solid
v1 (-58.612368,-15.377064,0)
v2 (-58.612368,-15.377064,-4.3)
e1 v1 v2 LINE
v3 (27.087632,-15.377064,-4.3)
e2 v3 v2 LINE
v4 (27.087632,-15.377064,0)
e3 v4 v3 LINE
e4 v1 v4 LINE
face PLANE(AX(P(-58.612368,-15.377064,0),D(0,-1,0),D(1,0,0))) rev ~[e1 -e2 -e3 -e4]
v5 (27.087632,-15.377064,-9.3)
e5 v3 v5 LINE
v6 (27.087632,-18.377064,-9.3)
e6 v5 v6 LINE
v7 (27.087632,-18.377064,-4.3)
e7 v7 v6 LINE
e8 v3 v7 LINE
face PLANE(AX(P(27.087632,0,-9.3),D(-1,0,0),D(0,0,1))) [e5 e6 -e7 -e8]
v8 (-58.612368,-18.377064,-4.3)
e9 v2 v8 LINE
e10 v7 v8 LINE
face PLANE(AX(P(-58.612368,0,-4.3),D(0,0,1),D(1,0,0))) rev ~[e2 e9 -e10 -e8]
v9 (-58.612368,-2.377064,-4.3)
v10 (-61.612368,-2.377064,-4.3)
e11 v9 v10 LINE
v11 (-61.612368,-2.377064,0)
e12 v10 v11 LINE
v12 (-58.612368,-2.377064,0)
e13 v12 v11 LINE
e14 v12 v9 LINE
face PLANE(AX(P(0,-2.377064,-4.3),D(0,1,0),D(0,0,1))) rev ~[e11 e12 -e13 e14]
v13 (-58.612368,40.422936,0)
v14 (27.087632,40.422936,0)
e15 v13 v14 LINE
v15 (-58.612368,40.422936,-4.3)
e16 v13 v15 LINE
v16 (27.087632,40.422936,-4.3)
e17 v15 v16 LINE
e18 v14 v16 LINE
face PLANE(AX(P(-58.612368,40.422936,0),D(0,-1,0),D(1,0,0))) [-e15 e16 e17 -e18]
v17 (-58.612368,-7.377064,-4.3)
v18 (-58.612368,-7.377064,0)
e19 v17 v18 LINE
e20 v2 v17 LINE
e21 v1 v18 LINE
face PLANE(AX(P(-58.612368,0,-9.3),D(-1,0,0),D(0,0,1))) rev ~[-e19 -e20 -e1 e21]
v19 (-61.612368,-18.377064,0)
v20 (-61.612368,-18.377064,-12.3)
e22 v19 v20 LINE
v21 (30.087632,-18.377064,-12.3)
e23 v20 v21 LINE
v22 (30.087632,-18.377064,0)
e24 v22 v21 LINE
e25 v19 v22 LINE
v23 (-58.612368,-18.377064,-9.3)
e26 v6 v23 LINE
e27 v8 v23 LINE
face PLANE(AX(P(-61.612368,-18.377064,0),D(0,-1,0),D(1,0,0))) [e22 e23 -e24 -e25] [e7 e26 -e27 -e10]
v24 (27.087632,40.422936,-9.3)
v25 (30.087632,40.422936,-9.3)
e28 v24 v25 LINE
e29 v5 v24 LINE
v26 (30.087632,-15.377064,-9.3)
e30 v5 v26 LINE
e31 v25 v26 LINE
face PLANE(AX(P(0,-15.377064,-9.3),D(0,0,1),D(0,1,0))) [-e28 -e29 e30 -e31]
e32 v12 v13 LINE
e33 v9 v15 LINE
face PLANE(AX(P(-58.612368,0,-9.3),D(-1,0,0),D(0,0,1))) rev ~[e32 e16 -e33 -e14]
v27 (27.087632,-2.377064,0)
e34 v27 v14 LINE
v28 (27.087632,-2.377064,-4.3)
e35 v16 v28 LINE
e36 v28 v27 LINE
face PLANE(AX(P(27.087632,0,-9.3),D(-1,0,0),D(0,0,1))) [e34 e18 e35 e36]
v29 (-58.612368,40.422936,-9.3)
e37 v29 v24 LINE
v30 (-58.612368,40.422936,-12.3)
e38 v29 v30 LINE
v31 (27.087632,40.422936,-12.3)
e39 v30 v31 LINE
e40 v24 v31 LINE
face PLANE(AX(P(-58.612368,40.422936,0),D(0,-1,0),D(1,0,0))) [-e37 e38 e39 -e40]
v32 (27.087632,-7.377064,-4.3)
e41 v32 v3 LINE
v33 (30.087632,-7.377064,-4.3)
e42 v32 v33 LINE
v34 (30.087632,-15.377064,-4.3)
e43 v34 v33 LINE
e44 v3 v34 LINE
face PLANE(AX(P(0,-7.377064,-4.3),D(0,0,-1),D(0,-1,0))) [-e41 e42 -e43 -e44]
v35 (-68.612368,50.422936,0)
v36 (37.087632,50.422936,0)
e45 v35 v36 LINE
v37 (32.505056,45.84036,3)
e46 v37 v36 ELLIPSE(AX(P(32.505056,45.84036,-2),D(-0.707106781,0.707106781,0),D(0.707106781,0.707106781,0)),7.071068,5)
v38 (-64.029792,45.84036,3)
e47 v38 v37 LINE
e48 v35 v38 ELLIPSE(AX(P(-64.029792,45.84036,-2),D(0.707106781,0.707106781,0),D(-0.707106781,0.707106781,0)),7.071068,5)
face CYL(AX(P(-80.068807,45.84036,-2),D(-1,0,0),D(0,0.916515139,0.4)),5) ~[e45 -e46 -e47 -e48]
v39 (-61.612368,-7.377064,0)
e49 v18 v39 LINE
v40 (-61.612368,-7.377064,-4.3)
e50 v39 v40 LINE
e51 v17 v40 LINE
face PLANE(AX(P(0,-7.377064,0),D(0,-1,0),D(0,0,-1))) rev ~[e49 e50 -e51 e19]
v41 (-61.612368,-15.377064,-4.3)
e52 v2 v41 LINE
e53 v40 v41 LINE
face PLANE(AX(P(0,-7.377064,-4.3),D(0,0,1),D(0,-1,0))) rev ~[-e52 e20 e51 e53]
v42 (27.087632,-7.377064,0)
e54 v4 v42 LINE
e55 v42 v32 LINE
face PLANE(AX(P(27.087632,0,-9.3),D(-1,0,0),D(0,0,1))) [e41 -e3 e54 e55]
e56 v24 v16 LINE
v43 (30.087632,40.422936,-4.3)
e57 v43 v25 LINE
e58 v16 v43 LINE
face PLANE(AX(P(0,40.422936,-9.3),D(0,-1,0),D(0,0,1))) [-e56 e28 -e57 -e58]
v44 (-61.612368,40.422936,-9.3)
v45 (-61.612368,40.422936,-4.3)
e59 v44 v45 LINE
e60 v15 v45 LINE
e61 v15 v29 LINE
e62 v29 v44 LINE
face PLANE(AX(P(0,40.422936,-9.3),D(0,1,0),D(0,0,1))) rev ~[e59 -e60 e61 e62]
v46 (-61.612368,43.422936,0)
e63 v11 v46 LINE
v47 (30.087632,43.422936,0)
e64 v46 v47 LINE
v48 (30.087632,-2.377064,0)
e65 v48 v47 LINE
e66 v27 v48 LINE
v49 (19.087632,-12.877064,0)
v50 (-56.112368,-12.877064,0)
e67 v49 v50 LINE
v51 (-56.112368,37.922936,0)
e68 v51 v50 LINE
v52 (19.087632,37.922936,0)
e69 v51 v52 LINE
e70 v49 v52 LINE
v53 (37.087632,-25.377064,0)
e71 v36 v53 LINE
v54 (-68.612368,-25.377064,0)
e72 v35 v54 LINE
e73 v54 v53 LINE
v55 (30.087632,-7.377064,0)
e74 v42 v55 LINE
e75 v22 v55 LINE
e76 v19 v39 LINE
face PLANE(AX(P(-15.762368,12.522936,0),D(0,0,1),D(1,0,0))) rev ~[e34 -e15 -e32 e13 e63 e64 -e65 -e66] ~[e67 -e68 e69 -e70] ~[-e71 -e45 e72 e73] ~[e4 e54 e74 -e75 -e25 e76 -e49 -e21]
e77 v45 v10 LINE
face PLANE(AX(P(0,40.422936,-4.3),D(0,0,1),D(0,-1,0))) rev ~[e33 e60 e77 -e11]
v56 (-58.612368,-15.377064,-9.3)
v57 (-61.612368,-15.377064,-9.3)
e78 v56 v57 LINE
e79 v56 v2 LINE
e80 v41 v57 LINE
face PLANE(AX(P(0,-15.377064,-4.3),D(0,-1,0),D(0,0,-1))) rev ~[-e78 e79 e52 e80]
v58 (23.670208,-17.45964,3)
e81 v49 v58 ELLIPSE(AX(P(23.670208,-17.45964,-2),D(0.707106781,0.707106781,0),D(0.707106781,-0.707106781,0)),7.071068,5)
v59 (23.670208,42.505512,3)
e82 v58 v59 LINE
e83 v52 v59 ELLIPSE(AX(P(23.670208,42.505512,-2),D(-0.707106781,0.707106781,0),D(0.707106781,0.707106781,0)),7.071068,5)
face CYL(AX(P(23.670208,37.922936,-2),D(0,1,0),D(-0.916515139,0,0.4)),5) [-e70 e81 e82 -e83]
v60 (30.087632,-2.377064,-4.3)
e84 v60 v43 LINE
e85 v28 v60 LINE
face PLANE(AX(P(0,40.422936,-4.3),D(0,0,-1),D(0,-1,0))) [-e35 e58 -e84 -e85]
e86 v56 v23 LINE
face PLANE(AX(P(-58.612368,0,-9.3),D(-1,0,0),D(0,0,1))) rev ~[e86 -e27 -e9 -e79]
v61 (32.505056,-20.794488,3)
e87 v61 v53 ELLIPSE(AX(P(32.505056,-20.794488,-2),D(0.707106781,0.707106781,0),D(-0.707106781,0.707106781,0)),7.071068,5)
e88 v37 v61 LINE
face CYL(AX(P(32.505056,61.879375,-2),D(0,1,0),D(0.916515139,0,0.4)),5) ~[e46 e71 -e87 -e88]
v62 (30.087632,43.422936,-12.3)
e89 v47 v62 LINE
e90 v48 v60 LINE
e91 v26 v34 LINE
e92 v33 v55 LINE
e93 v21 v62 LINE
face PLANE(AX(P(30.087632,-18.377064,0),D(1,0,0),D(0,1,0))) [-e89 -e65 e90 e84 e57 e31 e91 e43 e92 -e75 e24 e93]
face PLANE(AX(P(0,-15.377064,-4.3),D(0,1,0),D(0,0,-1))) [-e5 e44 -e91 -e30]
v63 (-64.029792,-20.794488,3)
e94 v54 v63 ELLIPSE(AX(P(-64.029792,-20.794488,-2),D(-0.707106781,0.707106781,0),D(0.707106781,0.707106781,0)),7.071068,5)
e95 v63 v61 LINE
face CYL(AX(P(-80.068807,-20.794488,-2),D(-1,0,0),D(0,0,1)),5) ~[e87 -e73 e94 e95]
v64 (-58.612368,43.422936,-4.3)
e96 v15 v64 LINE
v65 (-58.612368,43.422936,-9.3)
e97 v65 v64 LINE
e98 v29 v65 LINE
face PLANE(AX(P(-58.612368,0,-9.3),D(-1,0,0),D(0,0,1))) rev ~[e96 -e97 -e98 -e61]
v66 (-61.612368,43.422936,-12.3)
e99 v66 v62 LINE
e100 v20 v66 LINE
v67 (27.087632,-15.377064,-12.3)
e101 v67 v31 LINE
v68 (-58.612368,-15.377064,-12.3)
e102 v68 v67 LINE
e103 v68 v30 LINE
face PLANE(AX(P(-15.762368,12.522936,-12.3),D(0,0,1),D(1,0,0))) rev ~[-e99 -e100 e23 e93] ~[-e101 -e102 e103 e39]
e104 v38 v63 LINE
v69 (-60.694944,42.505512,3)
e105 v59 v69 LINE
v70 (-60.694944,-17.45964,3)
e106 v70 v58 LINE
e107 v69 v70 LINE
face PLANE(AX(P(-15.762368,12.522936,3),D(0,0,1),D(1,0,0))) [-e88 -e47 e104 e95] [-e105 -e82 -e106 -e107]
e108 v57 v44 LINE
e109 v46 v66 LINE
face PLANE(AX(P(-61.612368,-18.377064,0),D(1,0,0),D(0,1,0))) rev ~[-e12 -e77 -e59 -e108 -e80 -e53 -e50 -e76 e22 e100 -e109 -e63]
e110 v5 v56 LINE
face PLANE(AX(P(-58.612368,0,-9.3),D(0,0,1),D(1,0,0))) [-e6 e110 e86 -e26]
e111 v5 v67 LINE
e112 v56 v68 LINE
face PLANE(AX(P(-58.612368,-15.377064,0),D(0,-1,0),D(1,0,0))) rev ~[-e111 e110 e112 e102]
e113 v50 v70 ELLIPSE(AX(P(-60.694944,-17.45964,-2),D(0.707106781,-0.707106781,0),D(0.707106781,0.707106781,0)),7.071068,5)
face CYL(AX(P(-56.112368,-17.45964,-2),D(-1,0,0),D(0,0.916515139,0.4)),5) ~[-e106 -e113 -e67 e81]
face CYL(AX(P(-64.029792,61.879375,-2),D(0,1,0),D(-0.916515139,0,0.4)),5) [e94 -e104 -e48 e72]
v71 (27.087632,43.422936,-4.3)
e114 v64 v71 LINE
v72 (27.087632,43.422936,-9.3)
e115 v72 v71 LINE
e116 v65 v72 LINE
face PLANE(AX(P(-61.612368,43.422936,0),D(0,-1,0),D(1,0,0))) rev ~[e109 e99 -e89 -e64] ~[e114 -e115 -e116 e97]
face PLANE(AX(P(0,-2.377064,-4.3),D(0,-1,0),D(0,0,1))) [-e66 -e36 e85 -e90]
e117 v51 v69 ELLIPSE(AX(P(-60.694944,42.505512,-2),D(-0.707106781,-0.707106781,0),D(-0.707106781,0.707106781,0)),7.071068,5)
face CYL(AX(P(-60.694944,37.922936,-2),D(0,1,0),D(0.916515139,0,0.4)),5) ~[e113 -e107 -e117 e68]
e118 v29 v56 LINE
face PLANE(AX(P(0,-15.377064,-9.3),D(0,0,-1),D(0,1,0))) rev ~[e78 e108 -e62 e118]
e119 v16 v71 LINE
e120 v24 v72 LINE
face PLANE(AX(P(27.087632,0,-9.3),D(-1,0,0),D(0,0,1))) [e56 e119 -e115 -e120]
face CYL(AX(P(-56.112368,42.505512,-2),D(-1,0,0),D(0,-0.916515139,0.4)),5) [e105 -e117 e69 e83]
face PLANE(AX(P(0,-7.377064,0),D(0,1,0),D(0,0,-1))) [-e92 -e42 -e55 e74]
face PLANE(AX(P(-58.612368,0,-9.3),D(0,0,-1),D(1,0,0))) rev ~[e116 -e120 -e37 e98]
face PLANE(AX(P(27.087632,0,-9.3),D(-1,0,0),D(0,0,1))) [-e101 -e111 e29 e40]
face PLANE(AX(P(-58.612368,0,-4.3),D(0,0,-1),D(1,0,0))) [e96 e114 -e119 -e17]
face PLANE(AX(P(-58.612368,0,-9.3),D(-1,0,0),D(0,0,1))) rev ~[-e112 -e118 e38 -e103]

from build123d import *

# Parameters (mm, degrees)
F2_W          = 105.7
F2_H          = 75.8
F2_W_2        = 8
F2_H_2        = 2.5
F2_H_3        = 50.8
F4_DEPTH      = 3
F3_W          = 91.7
F3_H          = 61.8
F3_W_2        = 85.7
F3_H_2        = 55.8
F5_DEPTH      = 12.3
F6_W          = 85.7
F6_H          = 5
F7_DEPTH      = 50.4239358673
F7_DEPTH_BACK = 25
F9_DEPTH      = 68.6133680484
F9_DEPTH_BACK = 37.0886319516
F10_T1_DEPTH  = 98.7128784748
F10_T3_DEPTH  = 128.6128784748
F10_T5_DEPTH  = 50.8
F10_T7_DEPTH  = 75.2
F10_T13_DEPTH = 62.2564392374
F10_T17_DEPTH = 86.6564392374
F10_T24_DEPTH = 86.6564392374
F10_T28_DEPTH = 62.2564392374
F10_T35_DEPTH = 86.6564392374
F10_T39_DEPTH = 62.2564392374
F10_T46_DEPTH = 86.6564392374
F10_T50_DEPTH = 62.2564392374


# Not quite as in the source:
# - a fillet or chamfer that OpenCascade refuses, or shapes differently, is made with other operations: its cross-section is extruded or revolved along the edge and cut away or added


with BuildPart() as f4:
    # F2 (on Top) → F4 (new body)
    with BuildSketch(Plane.XY):
        with Locations((-15.7623680484, 12.5229358673)):
            Rectangle(F2_W, F2_H)
        Polygon((-58.6123680484, -15.3770641327), (-58.6123680484, 40.4229358673), (19.0876319516, 40.4229358673), (27.0876319516, 40.4229358673), (27.0876319516, 37.9229358673), (27.0876319516, -12.8770641327), (27.0876319516, -15.3770641327), (19.0876319516, -15.3770641327), align=None, mode=Mode.SUBTRACT)
        Polygon((19.0876319516, 40.4229358673), (-58.6123680484, 40.4229358673), (-58.6123680484, -15.3770641327), (19.0876319516, -15.3770641327), (19.0876319516, -12.8770641327), (-56.1123680484, -12.8770641327), (-56.1123680484, 37.9229358673), (19.0876319516, 37.9229358673), align=None)
        with Locations((23.0876319516, 39.1729358673)):
            Rectangle(F2_W_2, F2_H_2)
        with Locations((23.0876319516, 12.5229358673)):
            Rectangle(F2_W_2, F2_H_3)
        with Locations((23.0876319516, -14.1270641327)):
            Rectangle(F2_W_2, F2_H_2)
    extrude(amount=F4_DEPTH)

    # F3 (on Top) → F5 (join)
    with BuildSketch(Plane.XY):
        with Locations((-15.7623680484, 12.5229358673)):
            Rectangle(F3_W, F3_H)
        with Locations((-15.7623680484, 12.5229358673)):
            Rectangle(F3_W_2, F3_H_2, mode=Mode.SUBTRACT)
    extrude(amount=-F5_DEPTH)

    # F6 (on Front) → F7 (cut, two sides)
    with BuildSketch(Plane.XZ) as f7_sk:
        with Locations((-15.7623680484, -6.8)):
            Rectangle(F6_W, F6_H)
    extrude(amount=-F7_DEPTH, mode=Mode.SUBTRACT)
    extrude(f7_sk.sketch, amount=F7_DEPTH_BACK, mode=Mode.SUBTRACT)

    # F8 (on Right) → F9 (cut, two sides)
    with BuildSketch(Plane.YZ) as f9_sk:
        Polygon((-2.3770641327, -3.112567123), (-2.3770641327, 0), (-7.3770641327, 0), (-7.3770641327, -3.112567123), (-7.3770641327, -4.3), (-2.3770641327, -4.3), align=None)
        Polygon((40.4229358673, -9.3), (40.4229358673, -4.3), (-2.3770641327, -4.3), (-7.3770641327, -4.3), (-15.3770641327, -4.3), (-15.3770641327, -9.3), align=None)
    extrude(amount=-F9_DEPTH, mode=Mode.SUBTRACT)
    extrude(f9_sk.sketch, amount=F9_DEPTH_BACK, mode=Mode.SUBTRACT)

    # F10: fillet of radius 5 on 8 edges, made by hand

    # F10_s2 → F10_t1 (cut)
    with BuildSketch(Plane.XZ.offset(-61.8793751047)):
        with BuildLine():
            ThreePointArc((37.0876319516, 0), (35.2436690442, 2.1833001327), (32.5050562567, 3))
            Line((32.5050562567, 3), (32.5050562567, 3.1))
            Line((32.5050562567, 3.1), (37.0876319516, 3.1))
            Line((37.0876319516, 3.1), (37.1876319516, 3))
            ThreePointArc((37.1876319516, 3), (37.1876319516, 1.5), (37.1792834655, 0.04))
            Line((37.1792834655, 0.04), (37.0876319516, 0))
        make_face()
        with BuildLine():
            ThreePointArc((-68.6123680484, 0), (-66.768405141, 2.1833001327), (-64.0297923534, 3))
            Line((-64.0297923534, 3), (-64.0297923534, 3.1))
            Line((-64.0297923534, 3.1), (-68.6123680484, 3.1))
            Line((-68.6123680484, 3.1), (-68.7123680484, 3))
            ThreePointArc((-68.7123680484, 3), (-68.7123680484, 1.5), (-68.7040195623, 0.04))
            Line((-68.7040195623, 0.04), (-68.6123680484, 0))
        make_face()
    extrude(amount=F10_T1_DEPTH, mode=Mode.SUBTRACT)

    # F10_s4 → F10_t3 (cut)
    with BuildSketch(Plane.YZ.offset(-80.0688072858)):
        with BuildLine():
            ThreePointArc((50.4229358673, 0), (48.5789729599, 2.1833001327), (45.8403601724, 3))
            Line((45.8403601724, 3), (45.8403601724, 3.1))
            Line((45.8403601724, 3.1), (50.4229358673, 3.1))
            Line((50.4229358673, 3.1), (50.5229358673, 3))
            ThreePointArc((50.5229358673, 3), (50.5229358673, 1.5), (50.5145873812, 0.04))
            Line((50.5145873812, 0.04), (50.4229358673, 0))
        make_face()
        with BuildLine():
            ThreePointArc((-20.7944884377, 3), (-23.5331012253, 2.1833001327), (-25.3770641327, 0))
            Line((-25.3770641327, 0), (-25.4687156466, 0.04))
            ThreePointArc((-25.4687156466, 0.04), (-25.4770641327, 1.5), (-25.4770641327, 3))
            Line((-25.4770641327, 3), (-25.3770641327, 3.1))
            Line((-25.3770641327, 3.1), (-20.7944884377, 3.1))
            Line((-20.7944884377, 3.1), (-20.7944884377, 3))
        make_face()
    extrude(amount=F10_T3_DEPTH, mode=Mode.SUBTRACT)

    # F10_s6 → F10_t5 (cut)
    with BuildSketch(Plane.XZ.offset(-37.9229358673)):
        with BuildLine():
            ThreePointArc((19.0876319516, 0), (20.931594859, 2.1833001327), (23.6702076466, 3))
            Line((23.6702076466, 3), (23.6702076466, 3.1))
            Line((23.6702076466, 3.1), (19.0876319516, 3.1))
            Line((19.0876319516, 3.1), (18.9876319516, 3))
            ThreePointArc((18.9876319516, 3), (18.9876319516, 1.5), (18.9959804377, 0.04))
            Line((18.9959804377, 0.04), (19.0876319516, 0))
        make_face()
        with BuildLine():
            ThreePointArc((-56.1123680484, 0), (-57.9563309558, 2.1833001327), (-60.6949437433, 3))
            Line((-60.6949437433, 3), (-60.6949437433, 3.1))
            Line((-60.6949437433, 3.1), (-56.1123680484, 3.1))
            Line((-56.1123680484, 3.1), (-56.0123680484, 3))
            ThreePointArc((-56.0123680484, 3), (-56.0123680484, 1.5), (-56.0207165345, 0.04))
            Line((-56.0207165345, 0.04), (-56.1123680484, 0))
        make_face()
    extrude(amount=F10_T5_DEPTH, mode=Mode.SUBTRACT)

    # F10_s8 → F10_t7 (cut)
    with BuildSketch(Plane.YZ.offset(-56.1123680484)):
        with BuildLine():
            ThreePointArc((-12.8770641327, 0), (-14.7210270401, 2.1833001327), (-17.4596398276, 3))
            Line((-17.4596398276, 3), (-17.4596398276, 3.1))
            Line((-17.4596398276, 3.1), (-12.8770641327, 3.1))
            Line((-12.8770641327, 3.1), (-12.7770641327, 3))
            ThreePointArc((-12.7770641327, 3), (-12.7770641327, 1.5), (-12.7854126188, 0.04))
            Line((-12.7854126188, 0.04), (-12.8770641327, 0))
        make_face()
        with BuildLine():
            ThreePointArc((37.9229358673, 0), (39.7668987747, 2.1833001327), (42.5055115623, 3))
            Line((42.5055115623, 3), (42.5055115623, 3.1))
            Line((42.5055115623, 3.1), (37.9229358673, 3.1))
            Line((37.9229358673, 3.1), (37.8229358673, 3))
            ThreePointArc((37.8229358673, 3), (37.8229358673, 1.5), (37.8312843534, 0.04))
            Line((37.8312843534, 0.04), (37.9229358673, 0))
        make_face()
    extrude(amount=F10_T7_DEPTH, mode=Mode.SUBTRACT)


with BuildPart() as f10_tool11:
    # F10_s12 → F10_t13 (new body)
    with BuildSketch(Plane.XZ.offset(-49.3793751047)):
        with BuildLine():
            ThreePointArc((19.0876319516, 0), (20.931594859, 2.1833001327), (23.6702076466, 3))
            Line((23.6702076466, 3), (23.6702076466, 3.1))
            Line((23.6702076466, 3.1), (19.0876319516, 3.1))
            Line((19.0876319516, 3.1), (18.9876319516, 3))
            ThreePointArc((18.9876319516, 3), (18.9876319516, 1.5), (18.9959804377, 0.04))
            Line((18.9959804377, 0.04), (19.0876319516, 0))
        make_face()
    extrude(amount=F10_T13_DEPTH)

    split(bisect_by=Plane.XZ.offset(-37.9229358673), keep=Keep.BOTTOM)


with BuildPart() as f10_tool15:
    # F10_s16 → F10_t17 (new body)
    with BuildSketch(Plane.YZ.offset(-56.1123680484)):
        with BuildLine():
            ThreePointArc((37.9229358673, 0), (39.7668987747, 2.1833001327), (42.5055115623, 3))
            Line((42.5055115623, 3), (42.5055115623, 3.1))
            Line((42.5055115623, 3.1), (37.9229358673, 3.1))
            Line((37.9229358673, 3.1), (37.8229358673, 3))
            ThreePointArc((37.8229358673, 3), (37.8229358673, 1.5), (37.8312843534, 0.04))
            Line((37.8312843534, 0.04), (37.9229358673, 0))
        make_face()
    extrude(amount=F10_T17_DEPTH)

    split(bisect_by=Plane.YZ.offset(19.0876319516), keep=Keep.TOP)


with BuildPart() as f10_tool11_1:
    add(f10_tool11.part)

    # F10_t19: intersect F10_tool15
    add(f10_tool15.part, mode=Mode.INTERSECT)


with BuildPart() as f4_1:
    add(f4.part)

    # F10_t9: cut F10_tool11
    add(f10_tool11_1.part, mode=Mode.SUBTRACT)


with BuildPart() as f10_tool22:
    # F10_s23 → F10_t24 (new body)
    with BuildSketch(Plane.YZ.offset(30.544071189)):
        with BuildLine():
            ThreePointArc((-12.8770641327, 0), (-14.7210270401, 2.1833001327), (-17.4596398276, 3))
            Line((-17.4596398276, 3), (-17.4596398276, 3.1))
            Line((-17.4596398276, 3.1), (-12.8770641327, 3.1))
            Line((-12.8770641327, 3.1), (-12.7770641327, 3))
            ThreePointArc((-12.7770641327, 3), (-12.7770641327, 1.5), (-12.7854126188, 0.04))
            Line((-12.7854126188, 0.04), (-12.8770641327, 0))
        make_face()
    extrude(amount=-F10_T24_DEPTH)

    split(bisect_by=Plane.YZ.offset(19.0876319516), keep=Keep.TOP)


with BuildPart() as f10_tool26:
    # F10_s27 → F10_t28 (new body)
    with BuildSketch(Plane.XZ.offset(-37.9229358673)):
        with BuildLine():
            ThreePointArc((19.0876319516, 0), (20.931594859, 2.1833001327), (23.6702076466, 3))
            Line((23.6702076466, 3), (23.6702076466, 3.1))
            Line((23.6702076466, 3.1), (19.0876319516, 3.1))
            Line((19.0876319516, 3.1), (18.9876319516, 3))
            ThreePointArc((18.9876319516, 3), (18.9876319516, 1.5), (18.9959804377, 0.04))
            Line((18.9959804377, 0.04), (19.0876319516, 0))
        make_face()
    extrude(amount=F10_T28_DEPTH)

    split(bisect_by=Plane.XZ.offset(12.8770641327), keep=Keep.TOP)


with BuildPart() as f10_tool22_1:
    add(f10_tool22.part)

    # F10_t30: intersect F10_tool26
    add(f10_tool26.part, mode=Mode.INTERSECT)


with BuildPart() as f4_2:
    add(f4_1.part)

    # F10_t20: cut F10_tool22
    add(f10_tool22_1.part, mode=Mode.SUBTRACT)


with BuildPart() as f10_tool33:
    # F10_s34 → F10_t35 (new body)
    with BuildSketch(Plane.YZ.offset(19.0876319516)):
        with BuildLine():
            ThreePointArc((-12.8770641327, 0), (-14.7210270401, 2.1833001327), (-17.4596398276, 3))
            Line((-17.4596398276, 3), (-17.4596398276, 3.1))
            Line((-17.4596398276, 3.1), (-12.8770641327, 3.1))
            Line((-12.8770641327, 3.1), (-12.7770641327, 3))
            ThreePointArc((-12.7770641327, 3), (-12.7770641327, 1.5), (-12.7854126188, 0.04))
            Line((-12.7854126188, 0.04), (-12.8770641327, 0))
        make_face()
    extrude(amount=-F10_T35_DEPTH)

    split(bisect_by=Plane.YZ.offset(-56.1123680484), keep=Keep.BOTTOM)


with BuildPart() as f10_tool37:
    # F10_s38 → F10_t39 (new body)
    with BuildSketch(Plane.XZ.offset(24.3335033701)):
        with BuildLine():
            ThreePointArc((-56.1123680484, 0), (-57.9563309558, 2.1833001327), (-60.6949437433, 3))
            Line((-60.6949437433, 3), (-60.6949437433, 3.1))
            Line((-60.6949437433, 3.1), (-56.1123680484, 3.1))
            Line((-56.1123680484, 3.1), (-56.0123680484, 3))
            ThreePointArc((-56.0123680484, 3), (-56.0123680484, 1.5), (-56.0207165345, 0.04))
            Line((-56.0207165345, 0.04), (-56.1123680484, 0))
        make_face()
    extrude(amount=-F10_T39_DEPTH)

    split(bisect_by=Plane.XZ.offset(12.8770641327), keep=Keep.TOP)


with BuildPart() as f10_tool33_1:
    add(f10_tool33.part)

    # F10_t41: intersect F10_tool37
    add(f10_tool37.part, mode=Mode.INTERSECT)


with BuildPart() as f4_3:
    add(f4_2.part)

    # F10_t31: cut F10_tool33
    add(f10_tool33_1.part, mode=Mode.SUBTRACT)


with BuildPart() as f10_tool44:
    # F10_s45 → F10_t46 (new body)
    with BuildSketch(Plane.YZ.offset(-67.5688072858)):
        with BuildLine():
            ThreePointArc((37.9229358673, 0), (39.7668987747, 2.1833001327), (42.5055115623, 3))
            Line((42.5055115623, 3), (42.5055115623, 3.1))
            Line((42.5055115623, 3.1), (37.9229358673, 3.1))
            Line((37.9229358673, 3.1), (37.8229358673, 3))
            ThreePointArc((37.8229358673, 3), (37.8229358673, 1.5), (37.8312843534, 0.04))
            Line((37.8312843534, 0.04), (37.9229358673, 0))
        make_face()
    extrude(amount=F10_T46_DEPTH)

    split(bisect_by=Plane.YZ.offset(-56.1123680484), keep=Keep.BOTTOM)


with BuildPart() as f10_tool48:
    # F10_s49 → F10_t50 (new body)
    with BuildSketch(Plane.XZ.offset(12.8770641327)):
        with BuildLine():
            ThreePointArc((-56.1123680484, 0), (-57.9563309558, 2.1833001327), (-60.6949437433, 3))
            Line((-60.6949437433, 3), (-60.6949437433, 3.1))
            Line((-60.6949437433, 3.1), (-56.1123680484, 3.1))
            Line((-56.1123680484, 3.1), (-56.0123680484, 3))
            ThreePointArc((-56.0123680484, 3), (-56.0123680484, 1.5), (-56.0207165345, 0.04))
            Line((-56.0207165345, 0.04), (-56.1123680484, 0))
        make_face()
    extrude(amount=-F10_T50_DEPTH)

    split(bisect_by=Plane.XZ.offset(-37.9229358673), keep=Keep.BOTTOM)


with BuildPart() as f10_tool44_1:
    add(f10_tool44.part)

    # F10_t52: intersect F10_tool48
    add(f10_tool48.part, mode=Mode.INTERSECT)


with BuildPart() as f4_4:
    add(f4_3.part)

    # F10_t42: cut F10_tool44
    add(f10_tool44_1.part, mode=Mode.SUBTRACT)


solid = f4_4.part
